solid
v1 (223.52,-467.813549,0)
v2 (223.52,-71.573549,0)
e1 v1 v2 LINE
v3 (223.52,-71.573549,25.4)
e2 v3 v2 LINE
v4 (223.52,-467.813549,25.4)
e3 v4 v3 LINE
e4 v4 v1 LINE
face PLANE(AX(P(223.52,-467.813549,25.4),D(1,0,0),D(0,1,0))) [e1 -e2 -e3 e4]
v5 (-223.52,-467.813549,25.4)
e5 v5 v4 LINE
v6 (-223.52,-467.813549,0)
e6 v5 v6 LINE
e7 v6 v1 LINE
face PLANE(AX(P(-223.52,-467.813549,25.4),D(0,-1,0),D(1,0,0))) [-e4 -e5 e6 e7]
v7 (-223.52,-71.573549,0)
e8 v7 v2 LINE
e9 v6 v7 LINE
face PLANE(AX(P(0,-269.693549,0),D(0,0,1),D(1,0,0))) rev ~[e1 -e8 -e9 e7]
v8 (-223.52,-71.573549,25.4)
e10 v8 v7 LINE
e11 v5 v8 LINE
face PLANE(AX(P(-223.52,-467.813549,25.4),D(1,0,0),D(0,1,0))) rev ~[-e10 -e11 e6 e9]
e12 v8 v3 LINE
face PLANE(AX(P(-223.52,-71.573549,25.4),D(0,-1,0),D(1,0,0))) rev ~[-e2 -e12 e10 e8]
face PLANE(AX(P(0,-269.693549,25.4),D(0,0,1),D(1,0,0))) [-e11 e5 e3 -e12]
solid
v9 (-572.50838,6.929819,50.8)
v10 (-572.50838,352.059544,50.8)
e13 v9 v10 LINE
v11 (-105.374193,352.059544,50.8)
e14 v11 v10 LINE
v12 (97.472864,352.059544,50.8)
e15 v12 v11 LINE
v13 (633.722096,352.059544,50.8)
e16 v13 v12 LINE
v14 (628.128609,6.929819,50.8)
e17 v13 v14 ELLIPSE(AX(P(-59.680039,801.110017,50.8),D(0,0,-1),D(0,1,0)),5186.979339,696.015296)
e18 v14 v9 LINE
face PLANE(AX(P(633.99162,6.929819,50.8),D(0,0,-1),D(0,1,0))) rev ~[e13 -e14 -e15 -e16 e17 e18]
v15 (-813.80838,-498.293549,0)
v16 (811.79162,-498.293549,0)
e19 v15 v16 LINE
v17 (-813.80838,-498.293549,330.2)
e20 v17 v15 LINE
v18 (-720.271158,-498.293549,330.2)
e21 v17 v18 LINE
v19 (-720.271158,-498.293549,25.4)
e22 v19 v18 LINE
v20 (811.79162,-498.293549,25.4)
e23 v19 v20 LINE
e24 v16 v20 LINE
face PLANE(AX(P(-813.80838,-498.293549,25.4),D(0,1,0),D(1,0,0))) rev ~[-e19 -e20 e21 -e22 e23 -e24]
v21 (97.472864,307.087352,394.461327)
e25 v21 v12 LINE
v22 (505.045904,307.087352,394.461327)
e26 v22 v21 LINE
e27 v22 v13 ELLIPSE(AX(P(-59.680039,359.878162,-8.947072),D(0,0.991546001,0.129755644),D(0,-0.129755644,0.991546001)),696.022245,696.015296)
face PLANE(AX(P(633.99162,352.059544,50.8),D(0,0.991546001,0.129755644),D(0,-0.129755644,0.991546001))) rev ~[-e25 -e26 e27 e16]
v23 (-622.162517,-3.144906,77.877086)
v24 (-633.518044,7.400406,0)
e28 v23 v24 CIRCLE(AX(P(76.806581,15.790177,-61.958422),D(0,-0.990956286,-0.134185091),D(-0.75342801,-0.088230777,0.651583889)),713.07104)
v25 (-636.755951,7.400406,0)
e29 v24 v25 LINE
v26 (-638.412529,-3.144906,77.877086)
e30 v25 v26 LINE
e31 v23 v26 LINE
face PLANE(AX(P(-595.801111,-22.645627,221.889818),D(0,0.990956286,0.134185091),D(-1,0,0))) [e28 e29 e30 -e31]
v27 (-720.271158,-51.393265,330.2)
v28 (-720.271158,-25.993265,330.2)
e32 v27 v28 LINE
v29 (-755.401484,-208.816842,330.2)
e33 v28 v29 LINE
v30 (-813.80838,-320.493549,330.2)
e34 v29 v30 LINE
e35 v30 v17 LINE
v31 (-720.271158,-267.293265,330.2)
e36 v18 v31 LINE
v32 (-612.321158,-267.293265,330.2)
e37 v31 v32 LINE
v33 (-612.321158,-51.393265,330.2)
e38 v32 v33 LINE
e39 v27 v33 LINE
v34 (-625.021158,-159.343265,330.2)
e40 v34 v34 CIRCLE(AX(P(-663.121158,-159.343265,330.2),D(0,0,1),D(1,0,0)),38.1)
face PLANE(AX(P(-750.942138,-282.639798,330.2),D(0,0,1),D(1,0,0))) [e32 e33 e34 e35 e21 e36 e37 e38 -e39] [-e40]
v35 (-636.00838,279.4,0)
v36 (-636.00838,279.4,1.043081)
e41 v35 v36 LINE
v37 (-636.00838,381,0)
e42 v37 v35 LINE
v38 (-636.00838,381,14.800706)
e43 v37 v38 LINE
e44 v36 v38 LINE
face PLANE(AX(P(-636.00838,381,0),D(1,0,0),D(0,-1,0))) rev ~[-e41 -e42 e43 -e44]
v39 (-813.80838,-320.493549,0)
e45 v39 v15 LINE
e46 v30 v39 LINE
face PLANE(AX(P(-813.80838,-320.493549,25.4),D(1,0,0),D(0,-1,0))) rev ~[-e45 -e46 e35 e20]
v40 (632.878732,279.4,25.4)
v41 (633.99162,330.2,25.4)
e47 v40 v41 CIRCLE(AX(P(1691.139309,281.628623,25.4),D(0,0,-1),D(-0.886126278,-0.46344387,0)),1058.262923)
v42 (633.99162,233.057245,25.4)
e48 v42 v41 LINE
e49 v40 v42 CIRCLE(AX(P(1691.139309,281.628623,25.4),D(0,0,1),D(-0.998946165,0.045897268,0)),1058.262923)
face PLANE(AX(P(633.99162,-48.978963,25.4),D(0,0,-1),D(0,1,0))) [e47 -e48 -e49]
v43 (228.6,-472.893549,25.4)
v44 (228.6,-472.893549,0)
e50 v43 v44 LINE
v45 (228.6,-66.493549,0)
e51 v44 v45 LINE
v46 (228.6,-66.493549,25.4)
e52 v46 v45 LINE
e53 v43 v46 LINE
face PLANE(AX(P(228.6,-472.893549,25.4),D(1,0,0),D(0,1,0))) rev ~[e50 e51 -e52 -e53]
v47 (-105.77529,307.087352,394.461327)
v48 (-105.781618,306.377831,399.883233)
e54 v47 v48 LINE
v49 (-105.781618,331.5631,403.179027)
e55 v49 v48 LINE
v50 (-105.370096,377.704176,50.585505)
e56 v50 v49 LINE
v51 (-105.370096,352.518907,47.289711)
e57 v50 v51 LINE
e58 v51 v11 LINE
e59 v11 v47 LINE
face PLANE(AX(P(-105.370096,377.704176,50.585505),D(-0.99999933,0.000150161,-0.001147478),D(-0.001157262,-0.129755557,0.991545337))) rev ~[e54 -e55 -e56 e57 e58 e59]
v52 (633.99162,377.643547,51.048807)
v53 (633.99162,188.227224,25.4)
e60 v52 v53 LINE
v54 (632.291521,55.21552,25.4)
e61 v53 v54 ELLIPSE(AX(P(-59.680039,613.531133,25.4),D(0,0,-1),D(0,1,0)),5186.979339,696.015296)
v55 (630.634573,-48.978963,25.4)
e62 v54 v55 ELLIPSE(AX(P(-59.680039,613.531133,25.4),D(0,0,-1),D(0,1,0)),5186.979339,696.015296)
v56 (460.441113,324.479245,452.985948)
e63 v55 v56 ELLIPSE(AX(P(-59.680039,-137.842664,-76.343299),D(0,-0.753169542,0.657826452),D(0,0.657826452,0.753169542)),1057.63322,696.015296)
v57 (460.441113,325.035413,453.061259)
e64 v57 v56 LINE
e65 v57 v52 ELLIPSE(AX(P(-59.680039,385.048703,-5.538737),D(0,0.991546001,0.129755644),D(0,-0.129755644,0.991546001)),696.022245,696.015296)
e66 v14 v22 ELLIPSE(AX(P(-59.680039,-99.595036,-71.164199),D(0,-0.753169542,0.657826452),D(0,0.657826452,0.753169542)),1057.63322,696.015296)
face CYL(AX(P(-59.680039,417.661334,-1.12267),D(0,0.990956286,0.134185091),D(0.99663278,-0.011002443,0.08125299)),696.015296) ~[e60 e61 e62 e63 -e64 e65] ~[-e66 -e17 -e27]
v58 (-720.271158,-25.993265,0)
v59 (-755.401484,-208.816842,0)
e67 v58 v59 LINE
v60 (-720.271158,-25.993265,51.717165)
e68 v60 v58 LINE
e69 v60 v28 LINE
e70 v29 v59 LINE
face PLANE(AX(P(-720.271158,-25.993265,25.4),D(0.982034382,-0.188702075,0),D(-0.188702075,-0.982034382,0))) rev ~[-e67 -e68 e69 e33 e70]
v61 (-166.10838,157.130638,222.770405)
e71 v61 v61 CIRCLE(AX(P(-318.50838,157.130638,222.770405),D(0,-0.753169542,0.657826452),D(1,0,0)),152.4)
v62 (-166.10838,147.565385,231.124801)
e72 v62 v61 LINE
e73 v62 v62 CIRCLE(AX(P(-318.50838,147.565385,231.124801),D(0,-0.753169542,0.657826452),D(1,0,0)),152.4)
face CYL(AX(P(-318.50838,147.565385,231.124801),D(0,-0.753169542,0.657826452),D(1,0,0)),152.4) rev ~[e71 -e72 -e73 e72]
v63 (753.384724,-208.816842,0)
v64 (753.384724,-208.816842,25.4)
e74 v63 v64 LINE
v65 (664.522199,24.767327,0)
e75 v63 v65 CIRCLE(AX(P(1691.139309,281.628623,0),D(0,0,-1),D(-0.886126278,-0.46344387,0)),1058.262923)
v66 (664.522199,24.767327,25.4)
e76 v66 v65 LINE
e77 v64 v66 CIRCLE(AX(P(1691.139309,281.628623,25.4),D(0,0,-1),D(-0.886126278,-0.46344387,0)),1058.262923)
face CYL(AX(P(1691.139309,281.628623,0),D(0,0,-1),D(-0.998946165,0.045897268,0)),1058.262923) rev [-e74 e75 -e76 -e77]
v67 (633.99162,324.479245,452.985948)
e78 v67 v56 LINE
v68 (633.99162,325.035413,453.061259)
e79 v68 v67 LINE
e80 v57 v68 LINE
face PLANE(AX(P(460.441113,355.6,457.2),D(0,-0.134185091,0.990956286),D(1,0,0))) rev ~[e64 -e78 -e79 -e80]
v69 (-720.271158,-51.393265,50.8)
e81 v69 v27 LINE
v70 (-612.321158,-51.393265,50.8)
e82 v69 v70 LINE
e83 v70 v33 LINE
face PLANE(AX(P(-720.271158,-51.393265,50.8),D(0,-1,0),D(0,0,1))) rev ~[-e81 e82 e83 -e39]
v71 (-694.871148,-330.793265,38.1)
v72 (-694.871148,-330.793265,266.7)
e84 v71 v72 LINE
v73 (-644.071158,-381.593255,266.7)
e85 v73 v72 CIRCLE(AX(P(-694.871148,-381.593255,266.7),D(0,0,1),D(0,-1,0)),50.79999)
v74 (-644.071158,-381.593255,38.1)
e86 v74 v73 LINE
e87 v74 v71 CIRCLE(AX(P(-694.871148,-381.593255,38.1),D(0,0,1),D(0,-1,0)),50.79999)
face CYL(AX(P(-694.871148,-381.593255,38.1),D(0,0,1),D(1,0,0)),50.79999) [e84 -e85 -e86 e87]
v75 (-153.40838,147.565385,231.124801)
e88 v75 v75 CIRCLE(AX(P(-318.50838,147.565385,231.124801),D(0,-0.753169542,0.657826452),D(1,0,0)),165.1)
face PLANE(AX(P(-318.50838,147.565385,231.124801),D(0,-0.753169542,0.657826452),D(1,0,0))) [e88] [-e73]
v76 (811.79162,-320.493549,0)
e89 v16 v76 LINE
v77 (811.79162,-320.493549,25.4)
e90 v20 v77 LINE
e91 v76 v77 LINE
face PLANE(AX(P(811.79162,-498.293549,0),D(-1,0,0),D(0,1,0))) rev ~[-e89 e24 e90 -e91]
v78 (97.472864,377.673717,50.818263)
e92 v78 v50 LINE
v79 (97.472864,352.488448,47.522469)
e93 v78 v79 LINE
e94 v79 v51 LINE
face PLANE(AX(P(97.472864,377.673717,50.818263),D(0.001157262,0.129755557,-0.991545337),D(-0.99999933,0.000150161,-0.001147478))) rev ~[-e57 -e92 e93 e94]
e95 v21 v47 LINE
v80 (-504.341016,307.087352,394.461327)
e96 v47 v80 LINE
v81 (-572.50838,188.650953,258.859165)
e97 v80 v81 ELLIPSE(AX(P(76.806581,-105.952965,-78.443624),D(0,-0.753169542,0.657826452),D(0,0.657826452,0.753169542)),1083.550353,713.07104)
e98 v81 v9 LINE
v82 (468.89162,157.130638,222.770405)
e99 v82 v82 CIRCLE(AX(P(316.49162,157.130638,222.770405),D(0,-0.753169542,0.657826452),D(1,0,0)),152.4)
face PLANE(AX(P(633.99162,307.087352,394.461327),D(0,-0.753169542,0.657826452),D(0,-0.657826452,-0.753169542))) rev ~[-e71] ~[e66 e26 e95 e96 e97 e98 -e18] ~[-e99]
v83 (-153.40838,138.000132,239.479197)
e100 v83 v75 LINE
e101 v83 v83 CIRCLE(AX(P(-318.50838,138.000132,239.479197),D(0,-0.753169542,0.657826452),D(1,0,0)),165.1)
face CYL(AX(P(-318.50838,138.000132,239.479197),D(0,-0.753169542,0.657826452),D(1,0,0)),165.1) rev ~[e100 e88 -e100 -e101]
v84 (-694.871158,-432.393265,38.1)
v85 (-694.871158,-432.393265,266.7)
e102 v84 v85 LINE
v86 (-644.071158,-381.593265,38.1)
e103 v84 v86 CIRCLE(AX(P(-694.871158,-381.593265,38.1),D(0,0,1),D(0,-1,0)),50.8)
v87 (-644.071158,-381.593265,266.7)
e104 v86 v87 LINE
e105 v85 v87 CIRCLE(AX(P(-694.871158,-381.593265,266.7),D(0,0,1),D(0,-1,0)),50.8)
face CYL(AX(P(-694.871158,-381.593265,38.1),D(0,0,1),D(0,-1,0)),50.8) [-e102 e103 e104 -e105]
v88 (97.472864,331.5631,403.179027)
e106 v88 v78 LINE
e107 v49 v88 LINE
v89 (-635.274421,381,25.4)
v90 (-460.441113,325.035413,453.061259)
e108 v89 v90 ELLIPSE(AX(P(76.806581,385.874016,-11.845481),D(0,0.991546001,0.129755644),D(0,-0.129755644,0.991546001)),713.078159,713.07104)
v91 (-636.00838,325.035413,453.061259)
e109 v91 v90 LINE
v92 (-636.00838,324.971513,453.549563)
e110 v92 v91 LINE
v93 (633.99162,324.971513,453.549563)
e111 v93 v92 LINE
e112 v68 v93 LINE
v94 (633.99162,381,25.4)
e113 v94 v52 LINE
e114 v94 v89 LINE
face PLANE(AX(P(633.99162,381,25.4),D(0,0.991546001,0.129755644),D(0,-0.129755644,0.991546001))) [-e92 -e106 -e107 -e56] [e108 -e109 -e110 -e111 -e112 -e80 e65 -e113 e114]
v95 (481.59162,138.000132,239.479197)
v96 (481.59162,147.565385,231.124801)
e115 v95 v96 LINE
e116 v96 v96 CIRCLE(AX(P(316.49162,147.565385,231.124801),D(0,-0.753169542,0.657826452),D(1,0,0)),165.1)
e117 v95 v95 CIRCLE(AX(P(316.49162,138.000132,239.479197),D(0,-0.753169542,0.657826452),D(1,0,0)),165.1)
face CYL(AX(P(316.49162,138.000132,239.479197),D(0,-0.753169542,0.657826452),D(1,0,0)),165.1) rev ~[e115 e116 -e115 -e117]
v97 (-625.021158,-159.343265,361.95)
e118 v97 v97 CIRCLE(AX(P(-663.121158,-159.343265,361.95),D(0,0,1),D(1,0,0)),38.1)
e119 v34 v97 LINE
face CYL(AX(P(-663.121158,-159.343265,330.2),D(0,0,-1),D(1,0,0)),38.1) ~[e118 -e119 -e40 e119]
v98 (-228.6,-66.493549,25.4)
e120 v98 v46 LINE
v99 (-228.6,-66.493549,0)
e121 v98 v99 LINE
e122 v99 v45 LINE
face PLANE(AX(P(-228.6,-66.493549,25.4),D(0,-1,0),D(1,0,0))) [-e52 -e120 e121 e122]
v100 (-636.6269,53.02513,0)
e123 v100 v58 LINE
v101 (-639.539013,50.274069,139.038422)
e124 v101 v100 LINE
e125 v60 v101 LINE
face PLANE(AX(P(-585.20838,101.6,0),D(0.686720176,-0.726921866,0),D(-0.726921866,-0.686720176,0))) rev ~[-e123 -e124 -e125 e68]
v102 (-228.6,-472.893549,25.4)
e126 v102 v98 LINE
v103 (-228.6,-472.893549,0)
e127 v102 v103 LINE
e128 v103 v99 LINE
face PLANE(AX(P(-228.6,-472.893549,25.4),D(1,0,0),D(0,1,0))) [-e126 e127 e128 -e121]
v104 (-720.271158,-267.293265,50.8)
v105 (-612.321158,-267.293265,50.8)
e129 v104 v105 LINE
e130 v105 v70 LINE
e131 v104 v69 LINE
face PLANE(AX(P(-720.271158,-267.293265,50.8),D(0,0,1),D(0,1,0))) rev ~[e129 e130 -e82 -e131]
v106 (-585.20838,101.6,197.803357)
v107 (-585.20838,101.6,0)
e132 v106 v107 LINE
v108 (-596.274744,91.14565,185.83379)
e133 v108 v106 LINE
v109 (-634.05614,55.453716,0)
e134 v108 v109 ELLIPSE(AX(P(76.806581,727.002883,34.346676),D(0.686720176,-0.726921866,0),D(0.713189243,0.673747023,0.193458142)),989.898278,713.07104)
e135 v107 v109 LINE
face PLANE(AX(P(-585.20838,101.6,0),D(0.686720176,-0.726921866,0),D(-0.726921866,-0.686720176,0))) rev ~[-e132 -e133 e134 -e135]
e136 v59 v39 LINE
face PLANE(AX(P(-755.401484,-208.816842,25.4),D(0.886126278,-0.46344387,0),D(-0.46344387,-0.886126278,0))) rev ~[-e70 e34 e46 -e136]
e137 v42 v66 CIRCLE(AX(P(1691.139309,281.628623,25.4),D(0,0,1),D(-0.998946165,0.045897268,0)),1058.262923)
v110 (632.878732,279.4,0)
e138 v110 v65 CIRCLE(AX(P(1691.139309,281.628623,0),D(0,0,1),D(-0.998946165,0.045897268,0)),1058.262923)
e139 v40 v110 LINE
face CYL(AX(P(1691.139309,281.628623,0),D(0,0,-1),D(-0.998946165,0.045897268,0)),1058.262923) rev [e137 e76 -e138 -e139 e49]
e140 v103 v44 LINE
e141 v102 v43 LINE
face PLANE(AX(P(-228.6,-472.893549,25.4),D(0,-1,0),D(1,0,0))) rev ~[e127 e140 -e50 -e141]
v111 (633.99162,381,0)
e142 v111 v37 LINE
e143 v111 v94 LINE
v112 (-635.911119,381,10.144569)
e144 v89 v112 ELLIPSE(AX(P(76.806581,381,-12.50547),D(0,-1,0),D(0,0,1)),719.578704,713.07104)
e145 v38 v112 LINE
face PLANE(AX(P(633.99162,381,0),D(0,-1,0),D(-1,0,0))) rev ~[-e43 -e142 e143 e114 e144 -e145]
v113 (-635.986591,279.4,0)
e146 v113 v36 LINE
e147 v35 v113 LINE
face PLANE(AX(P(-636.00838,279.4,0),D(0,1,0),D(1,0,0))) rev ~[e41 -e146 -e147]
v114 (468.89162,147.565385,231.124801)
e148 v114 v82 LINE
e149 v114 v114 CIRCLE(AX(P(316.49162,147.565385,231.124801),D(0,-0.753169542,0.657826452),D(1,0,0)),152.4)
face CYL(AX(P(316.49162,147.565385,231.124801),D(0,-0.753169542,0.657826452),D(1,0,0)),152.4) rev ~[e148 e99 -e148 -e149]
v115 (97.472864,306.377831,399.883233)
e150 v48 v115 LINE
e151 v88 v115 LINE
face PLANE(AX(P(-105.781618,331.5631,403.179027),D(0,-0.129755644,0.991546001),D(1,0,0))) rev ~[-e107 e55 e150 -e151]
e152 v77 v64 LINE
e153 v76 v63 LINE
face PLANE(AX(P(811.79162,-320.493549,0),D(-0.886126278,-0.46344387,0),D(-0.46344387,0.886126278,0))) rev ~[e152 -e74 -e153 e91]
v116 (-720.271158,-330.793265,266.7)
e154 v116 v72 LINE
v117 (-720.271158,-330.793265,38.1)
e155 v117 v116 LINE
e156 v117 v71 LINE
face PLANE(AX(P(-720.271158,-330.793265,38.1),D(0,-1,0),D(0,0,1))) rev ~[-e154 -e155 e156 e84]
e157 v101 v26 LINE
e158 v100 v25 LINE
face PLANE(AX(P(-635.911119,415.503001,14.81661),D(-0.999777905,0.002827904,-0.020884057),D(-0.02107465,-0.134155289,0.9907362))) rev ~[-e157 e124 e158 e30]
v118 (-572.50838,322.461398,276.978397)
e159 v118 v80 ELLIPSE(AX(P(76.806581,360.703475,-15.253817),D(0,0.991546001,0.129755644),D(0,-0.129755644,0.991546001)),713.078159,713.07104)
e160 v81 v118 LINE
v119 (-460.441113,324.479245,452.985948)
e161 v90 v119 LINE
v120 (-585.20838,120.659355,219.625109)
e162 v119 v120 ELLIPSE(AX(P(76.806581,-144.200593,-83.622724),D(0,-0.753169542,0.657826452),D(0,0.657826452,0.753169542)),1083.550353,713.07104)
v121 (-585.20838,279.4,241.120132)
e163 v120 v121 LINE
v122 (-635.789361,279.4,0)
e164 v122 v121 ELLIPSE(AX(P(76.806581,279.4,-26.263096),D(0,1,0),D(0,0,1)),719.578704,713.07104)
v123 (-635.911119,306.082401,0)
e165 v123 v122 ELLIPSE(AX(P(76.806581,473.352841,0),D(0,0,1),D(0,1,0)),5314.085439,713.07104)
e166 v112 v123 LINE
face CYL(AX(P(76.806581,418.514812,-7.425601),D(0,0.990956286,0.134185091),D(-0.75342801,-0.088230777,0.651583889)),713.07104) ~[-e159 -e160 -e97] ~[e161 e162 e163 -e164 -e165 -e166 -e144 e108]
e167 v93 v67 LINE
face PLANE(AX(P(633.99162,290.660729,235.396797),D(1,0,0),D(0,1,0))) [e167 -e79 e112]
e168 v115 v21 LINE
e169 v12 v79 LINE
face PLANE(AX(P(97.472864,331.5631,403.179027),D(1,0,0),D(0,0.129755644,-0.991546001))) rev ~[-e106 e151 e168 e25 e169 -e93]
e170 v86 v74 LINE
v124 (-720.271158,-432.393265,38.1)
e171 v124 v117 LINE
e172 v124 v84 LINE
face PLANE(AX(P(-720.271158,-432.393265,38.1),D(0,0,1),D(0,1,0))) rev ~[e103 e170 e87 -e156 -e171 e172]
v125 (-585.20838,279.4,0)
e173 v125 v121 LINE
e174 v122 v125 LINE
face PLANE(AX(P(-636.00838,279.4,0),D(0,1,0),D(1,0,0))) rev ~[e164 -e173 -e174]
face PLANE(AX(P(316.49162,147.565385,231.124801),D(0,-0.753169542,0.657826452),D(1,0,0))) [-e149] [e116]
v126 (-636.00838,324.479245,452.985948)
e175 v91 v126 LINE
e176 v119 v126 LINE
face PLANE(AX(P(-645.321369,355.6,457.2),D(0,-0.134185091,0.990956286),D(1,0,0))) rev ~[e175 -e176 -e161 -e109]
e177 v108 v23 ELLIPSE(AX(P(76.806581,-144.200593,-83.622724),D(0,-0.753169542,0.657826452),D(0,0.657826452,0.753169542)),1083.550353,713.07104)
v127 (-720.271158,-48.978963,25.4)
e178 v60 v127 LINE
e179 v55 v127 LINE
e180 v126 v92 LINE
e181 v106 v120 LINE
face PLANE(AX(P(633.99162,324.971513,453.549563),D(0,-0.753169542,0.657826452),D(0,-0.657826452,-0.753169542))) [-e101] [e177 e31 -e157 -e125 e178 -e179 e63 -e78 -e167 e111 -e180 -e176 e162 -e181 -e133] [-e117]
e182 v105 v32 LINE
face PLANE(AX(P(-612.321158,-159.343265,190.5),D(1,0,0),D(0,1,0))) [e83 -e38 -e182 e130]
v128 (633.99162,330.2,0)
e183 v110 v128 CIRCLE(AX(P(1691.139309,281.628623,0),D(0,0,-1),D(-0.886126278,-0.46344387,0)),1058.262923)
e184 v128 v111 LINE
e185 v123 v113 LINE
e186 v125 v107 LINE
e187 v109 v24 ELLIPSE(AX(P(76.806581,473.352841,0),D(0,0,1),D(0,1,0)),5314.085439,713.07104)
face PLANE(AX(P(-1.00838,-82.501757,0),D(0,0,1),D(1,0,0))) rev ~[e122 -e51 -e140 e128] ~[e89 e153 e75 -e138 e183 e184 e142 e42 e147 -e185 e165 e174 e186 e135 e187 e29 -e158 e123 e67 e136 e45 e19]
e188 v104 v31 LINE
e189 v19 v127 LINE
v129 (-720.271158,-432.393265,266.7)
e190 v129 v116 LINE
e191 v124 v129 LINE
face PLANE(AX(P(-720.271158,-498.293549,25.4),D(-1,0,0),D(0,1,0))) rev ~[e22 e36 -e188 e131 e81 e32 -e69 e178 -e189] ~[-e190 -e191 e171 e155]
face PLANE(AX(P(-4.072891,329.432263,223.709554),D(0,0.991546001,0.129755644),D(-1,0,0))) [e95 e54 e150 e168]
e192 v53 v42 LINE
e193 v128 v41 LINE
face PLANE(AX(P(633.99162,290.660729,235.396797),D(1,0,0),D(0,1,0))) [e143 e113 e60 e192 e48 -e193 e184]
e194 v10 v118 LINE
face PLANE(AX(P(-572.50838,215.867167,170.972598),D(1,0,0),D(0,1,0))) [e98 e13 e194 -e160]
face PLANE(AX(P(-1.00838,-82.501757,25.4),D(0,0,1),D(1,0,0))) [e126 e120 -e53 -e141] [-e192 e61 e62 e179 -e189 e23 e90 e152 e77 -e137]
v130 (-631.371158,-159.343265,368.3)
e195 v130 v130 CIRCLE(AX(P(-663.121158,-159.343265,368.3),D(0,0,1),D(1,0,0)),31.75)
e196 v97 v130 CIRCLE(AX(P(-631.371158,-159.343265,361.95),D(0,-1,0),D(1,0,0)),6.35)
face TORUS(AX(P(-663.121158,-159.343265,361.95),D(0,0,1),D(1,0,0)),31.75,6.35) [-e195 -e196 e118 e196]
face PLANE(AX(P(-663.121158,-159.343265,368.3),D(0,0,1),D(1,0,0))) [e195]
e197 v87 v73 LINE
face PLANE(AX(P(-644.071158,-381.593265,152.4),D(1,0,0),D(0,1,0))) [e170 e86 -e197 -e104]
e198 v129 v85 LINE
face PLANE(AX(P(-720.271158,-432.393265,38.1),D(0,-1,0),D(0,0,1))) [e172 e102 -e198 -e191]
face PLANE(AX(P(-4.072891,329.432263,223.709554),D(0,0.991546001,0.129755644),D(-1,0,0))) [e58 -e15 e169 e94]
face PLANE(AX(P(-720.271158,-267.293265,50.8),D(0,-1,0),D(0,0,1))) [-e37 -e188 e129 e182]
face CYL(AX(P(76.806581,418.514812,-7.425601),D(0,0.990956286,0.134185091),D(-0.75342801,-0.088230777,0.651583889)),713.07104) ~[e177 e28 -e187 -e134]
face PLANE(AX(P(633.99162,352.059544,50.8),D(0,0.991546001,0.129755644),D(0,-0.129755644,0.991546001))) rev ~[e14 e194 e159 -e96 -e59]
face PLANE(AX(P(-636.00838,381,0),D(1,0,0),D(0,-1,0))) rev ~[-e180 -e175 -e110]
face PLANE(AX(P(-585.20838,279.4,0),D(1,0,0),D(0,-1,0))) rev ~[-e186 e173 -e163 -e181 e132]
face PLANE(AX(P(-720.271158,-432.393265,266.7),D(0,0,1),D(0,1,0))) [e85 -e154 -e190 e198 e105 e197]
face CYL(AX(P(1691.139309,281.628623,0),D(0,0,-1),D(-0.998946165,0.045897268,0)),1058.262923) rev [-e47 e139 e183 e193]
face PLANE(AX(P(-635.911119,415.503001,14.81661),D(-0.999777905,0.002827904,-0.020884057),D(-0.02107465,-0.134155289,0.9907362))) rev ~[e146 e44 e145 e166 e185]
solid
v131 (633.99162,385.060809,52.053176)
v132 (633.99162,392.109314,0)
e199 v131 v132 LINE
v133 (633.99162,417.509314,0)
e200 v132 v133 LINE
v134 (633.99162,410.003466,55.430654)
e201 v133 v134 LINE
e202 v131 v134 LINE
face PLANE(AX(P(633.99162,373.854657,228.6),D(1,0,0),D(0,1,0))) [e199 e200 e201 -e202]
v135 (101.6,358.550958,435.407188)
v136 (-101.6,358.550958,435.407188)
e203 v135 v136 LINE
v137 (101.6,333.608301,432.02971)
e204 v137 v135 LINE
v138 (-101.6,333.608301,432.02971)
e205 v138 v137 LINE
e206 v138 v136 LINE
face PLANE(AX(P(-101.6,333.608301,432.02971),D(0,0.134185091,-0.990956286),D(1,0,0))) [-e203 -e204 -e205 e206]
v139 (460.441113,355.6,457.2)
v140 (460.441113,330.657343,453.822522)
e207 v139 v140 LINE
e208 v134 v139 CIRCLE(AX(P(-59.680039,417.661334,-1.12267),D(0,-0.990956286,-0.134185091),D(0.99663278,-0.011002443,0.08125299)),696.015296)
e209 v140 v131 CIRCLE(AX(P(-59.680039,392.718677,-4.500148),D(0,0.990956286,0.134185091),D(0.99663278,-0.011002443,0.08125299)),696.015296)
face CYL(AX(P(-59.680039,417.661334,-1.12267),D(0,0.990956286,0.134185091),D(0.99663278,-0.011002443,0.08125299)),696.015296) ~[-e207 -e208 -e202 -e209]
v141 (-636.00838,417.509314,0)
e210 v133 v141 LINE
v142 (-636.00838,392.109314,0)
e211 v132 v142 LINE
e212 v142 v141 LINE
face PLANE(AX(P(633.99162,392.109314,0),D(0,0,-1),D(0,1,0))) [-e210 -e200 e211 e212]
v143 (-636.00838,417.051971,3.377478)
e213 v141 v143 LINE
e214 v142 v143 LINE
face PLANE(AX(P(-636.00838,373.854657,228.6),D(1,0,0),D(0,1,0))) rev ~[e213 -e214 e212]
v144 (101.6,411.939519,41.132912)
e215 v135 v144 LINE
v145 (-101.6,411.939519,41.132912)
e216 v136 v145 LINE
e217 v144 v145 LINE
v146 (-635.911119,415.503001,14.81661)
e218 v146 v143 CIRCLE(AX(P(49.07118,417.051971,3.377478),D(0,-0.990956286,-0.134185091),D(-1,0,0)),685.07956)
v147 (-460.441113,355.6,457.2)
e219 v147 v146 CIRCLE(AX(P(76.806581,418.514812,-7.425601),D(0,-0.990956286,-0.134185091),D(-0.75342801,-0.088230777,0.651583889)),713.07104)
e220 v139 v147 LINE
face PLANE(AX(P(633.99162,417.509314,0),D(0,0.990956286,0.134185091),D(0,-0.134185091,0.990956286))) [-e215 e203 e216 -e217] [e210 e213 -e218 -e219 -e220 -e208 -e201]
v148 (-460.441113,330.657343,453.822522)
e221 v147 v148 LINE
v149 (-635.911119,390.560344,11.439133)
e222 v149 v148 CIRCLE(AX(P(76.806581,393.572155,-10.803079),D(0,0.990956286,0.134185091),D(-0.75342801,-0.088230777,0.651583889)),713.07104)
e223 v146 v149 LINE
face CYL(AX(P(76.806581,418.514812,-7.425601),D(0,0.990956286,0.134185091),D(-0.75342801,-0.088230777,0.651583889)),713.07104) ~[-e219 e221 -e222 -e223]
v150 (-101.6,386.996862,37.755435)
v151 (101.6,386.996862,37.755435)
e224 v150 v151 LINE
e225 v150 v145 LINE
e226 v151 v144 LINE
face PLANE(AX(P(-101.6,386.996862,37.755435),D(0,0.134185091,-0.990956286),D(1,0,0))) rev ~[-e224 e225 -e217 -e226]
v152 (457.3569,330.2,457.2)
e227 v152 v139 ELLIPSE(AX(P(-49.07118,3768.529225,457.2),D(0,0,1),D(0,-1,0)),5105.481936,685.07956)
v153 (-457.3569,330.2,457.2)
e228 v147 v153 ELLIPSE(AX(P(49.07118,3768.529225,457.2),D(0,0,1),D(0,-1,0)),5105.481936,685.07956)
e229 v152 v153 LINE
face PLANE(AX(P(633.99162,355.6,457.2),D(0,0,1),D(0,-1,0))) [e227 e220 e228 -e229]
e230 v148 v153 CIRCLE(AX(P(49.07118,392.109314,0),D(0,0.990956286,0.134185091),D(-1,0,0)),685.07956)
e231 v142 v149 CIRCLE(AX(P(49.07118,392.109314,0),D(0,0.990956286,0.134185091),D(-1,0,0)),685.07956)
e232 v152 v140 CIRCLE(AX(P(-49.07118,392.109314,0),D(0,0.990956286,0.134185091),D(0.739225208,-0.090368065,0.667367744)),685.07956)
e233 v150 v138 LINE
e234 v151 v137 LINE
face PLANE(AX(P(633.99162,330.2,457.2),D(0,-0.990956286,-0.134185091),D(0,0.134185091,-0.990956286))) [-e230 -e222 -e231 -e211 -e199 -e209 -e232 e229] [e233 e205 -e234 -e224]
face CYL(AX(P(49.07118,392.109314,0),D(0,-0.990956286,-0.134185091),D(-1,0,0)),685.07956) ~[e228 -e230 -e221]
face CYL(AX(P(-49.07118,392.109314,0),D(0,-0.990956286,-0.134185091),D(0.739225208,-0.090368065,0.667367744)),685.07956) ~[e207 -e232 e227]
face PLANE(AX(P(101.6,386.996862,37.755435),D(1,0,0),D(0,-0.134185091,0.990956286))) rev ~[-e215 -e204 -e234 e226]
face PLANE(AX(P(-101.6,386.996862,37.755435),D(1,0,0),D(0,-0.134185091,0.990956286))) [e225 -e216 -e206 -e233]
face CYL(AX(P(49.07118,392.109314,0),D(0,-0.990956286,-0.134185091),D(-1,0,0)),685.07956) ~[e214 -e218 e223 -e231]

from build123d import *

# Parameters (mm, degrees)
F1_DEPTH  = 25.4
F3_DEPTH  = 1270
F5_W      = 457.2
F5_H      = 406.4
F6_DEPTH  = 25.4
F7_W      = 447.04
F7_H      = 396.24
F8_DEPTH  = 25.4
F10_DEPTH = 1358.9
F11_R     = 165.1
F12_DEPTH = 12.7
F14_DEPTH = 1206.5
F16_DEPTH = 25.4
F17_R     = 152.4
F18_DEPTH = 25.4
F4_W      = 203.2
F4_H      = 397.8725210062
F19_DEPTH = 25.4
F21_DEPTH = 25.4
F23_DEPTH = 459.74
F24_W     = 185.8009562355
F24_H     = 25.4
F25_DEPTH = 127
F27_DEPTH = 25.4
F29_DEPTH = 25.4
F31_DEPTH = 304.8
F32_W     = 215.9
F32_H     = 279.4
F33_DEPTH = 107.95
F34_W     = 101.6
F34_H     = 228.6
F35_DEPTH = 76.2
F36_R     = 50.8
F37_R     = 50.79999
F38_R     = 38.1
F39_DEPTH = 38.1
F40_R     = 6.35
F42_DEPTH = 508
F44_DEPTH = 406.4


# Not quite as in the source:
# - a fillet or chamfer is up to 0.001 mm smaller than in the source, because OpenCascade refuses the exact size


with BuildPart() as f1:
    # F0 (on Top) → F1 (new body)
    with BuildSketch(Plane.XY):
        Polygon((633.9916200739, 381), (-636.0083799261, 381), (-636.0083799261, 279.4), (-585.2083799261, 279.4), (-585.2083799261, 101.6), (-720.2711577423, -25.9932654437), (-755.401483878, -208.8168415053), (-813.8083799261, -320.4935488224), (-813.8083799261, -498.2935488224), (-636.0083799261, -498.2935488224), (633.9916200739, -498.2935488224), (811.7916200739, -498.2935488224), (811.7916200739, -320.4935488224), (753.3847240259, -208.8168415053), (718.2543978901, -25.9932654437), (583.1916200739, 101.6), (583.1916200739, 279.4), (633.9916200739, 279.4), align=None)
    extrude(amount=F1_DEPTH)

    # F5 (on face) → F6 (cut)
    with BuildSketch(Plane.XY.offset(25.4)):
        with Locations((0, -269.6935488224)):
            Rectangle(F5_W, F5_H)
    extrude(amount=-F6_DEPTH, mode=Mode.SUBTRACT)


with BuildPart() as f3:
    # F2 (on face) → F3 (new body)
    with BuildSketch(Plane.YZ.offset(633.9916200739)):
        Polygon((355.6, 457.2), (330.2, 457.2), (392.1093138361, 0), (417.5093138361, 0), align=None)
    extrude(amount=-F3_DEPTH)

    # F4 (on face) → F19 (cut)
    with BuildSketch(Plane(origin=(0, 385.0491351938, 52.1393870364), x_dir=(1, 0, 0), z_dir=(0, -0.9909562863, -0.1341850913))):
        with Locations((0, 184.4210364421)):
            Rectangle(F4_W, F4_H)
    extrude(amount=-F19_DEPTH, mode=Mode.SUBTRACT)

    # F20 (on face) → F21 (cut)
    with BuildSketch(Plane(origin=(0, 385.0491351938, 52.1393870364), x_dir=(1, 0, 0), z_dir=(0, -0.9909562863, -0.1341850913))):
        with BuildLine():
            ThreePointArc((-636.0083799261, -52.615224061), (-589.7862100298, 194.7614898935), (-457.3568999767, 408.7572969452))
            Line((-457.3568999767, 408.7572969452), (-636.0083799261, 408.7572969452))
            Line((-636.0083799261, 408.7572969452), (-636.0083799261, -52.615224061))
        make_face()
        with BuildLine():
            Line((633.9916200739, 408.7572969452), (457.3568999767, 408.7572969452))
            ThreePointArc((457.3568999767, 408.7572969452), (579.8251172789, 219.089488202), (633.9916200739, -0.0869975296))
            Line((633.9916200739, -0.0869975296), (633.9916200739, 408.7572969452))
        make_face()
    extrude(amount=-F21_DEPTH, mode=Mode.SUBTRACT)


with BuildPart() as f8:
    # F7 (on face) → F8 (new body)
    with BuildSketch(Plane.XY.offset(25.4)):
        with Locations((0, -269.6935488224)):
            Rectangle(F7_W, F7_H)
    extrude(amount=-F8_DEPTH)


with BuildPart() as f10:
    # F9 (on face) → F10 (new body)
    with BuildSketch(Plane.YZ.offset(633.9916200739)):
        Polygon((137.9962750452, 239.4747816958), (381, 25.4), (324.9715128924, 453.5495633916), align=None)
        Polygon((-48.9789628019, 25.4), (381, 25.4), (137.9962750452, 239.4747816958), align=None)
    extrude(amount=-F10_DEPTH)

    # F11 (on face) → F12 (cut)
    with BuildSketch(Plane(origin=(0, -40.3685730448, 35.2583498477), x_dir=(1, 0, 0), z_dir=(0, -0.7531695417, 0.6578264524))):
        with Locations((-318.5083799261, 271.1485742475)):
            Circle(F11_R)
        with Locations((316.4916200739, 271.1485742475)):
            Circle(F11_R)
    extrude(amount=-F12_DEPTH, mode=Mode.SUBTRACT)

    # F13 (on face) → F14 (cut)
    with BuildSketch(Plane.YZ.offset(633.9916200739)):
        Polygon((352.0595440659, 50.8), (307.0873524009, 394.4613269455), (6.9298194327, 50.8), align=None)
    extrude(amount=-F14_DEPTH, mode=Mode.SUBTRACT)

    # F15 (on face) → F16 (cut)
    with BuildSketch(Plane(origin=(0, 377.8532138761, 49.446608691), x_dir=(-1, 0, 0), z_dir=(0, 0.9915460014, 0.1297556441))):
        Polygon((105.7816183023, 356.7483680457), (-97.4728635717, 356.7483680457), (-97.4728635717, 1.383348692), (105.3700960746, 1.1486061652), align=None)
    extrude(amount=-F16_DEPTH, mode=Mode.SUBTRACT)

    # F17 (on face) → F18 (cut)
    with BuildSketch(Plane(origin=(0, -30.8033198656, 26.9039539021), x_dir=(1, 0, 0), z_dir=(0, -0.7531695417, 0.6578264524))):
        with Locations((-318.5083799261, 271.1485742475)):
            Circle(F17_R)
        with Locations((316.4916200739, 271.1485742475)):
            Circle(F17_R)
    extrude(amount=-F18_DEPTH, mode=Mode.SUBTRACT)


with BuildPart() as f23_tool:
    # F22 (on face) → F23 (new body)
    with BuildSketch(Plane(origin=(0, 409.9917919704, 55.5168646529), x_dir=(-1, 0, 0), z_dir=(0, 0.9909562863, 0.1341850913))):
        with BuildLine():
            ThreePointArc((-633.9916200739, -0.0869975295), (-580.1776273816, 216.7403618545), (-460.4411130957, 405.3489956272))
            Line((-460.4411130957, 405.3489956272), (-652.6208519936, 405.3489956272))
            Line((-652.6208519936, 405.3489956272), (-633.9916200739, -0.0869975295))
        make_face()
    extrude(amount=-F23_DEPTH)


with BuildPart() as f1_1:
    add(f1.part)

    # F23: cut by f23_tool
    add(f23_tool.part, mode=Mode.SUBTRACT)



with BuildPart() as f3_1:
    add(f3.part)

    # F23: cut by f23_tool
    add(f23_tool.part, mode=Mode.SUBTRACT)


with BuildPart() as f10_1:
    add(f10.part)

    # F23: cut by f23_tool
    add(f23_tool.part, mode=Mode.SUBTRACT)


with BuildPart() as f1_2:
    add(f1_1.part)

    add(f10_1.part)  # F25 merges F10
    # F24 (on face) → F25 (join)
    with BuildSketch(Plane(origin=(325.7420855468, 344.8115445011, 0), x_dir=(-0.726921866, 0.6867201764, 0), z_dir=(0.6867201764, 0.726921866, 0))):
        with Locations((-447.0644489093, 12.7)):
            Rectangle(F24_W, F24_H)
    extrude(amount=-F25_DEPTH)

    # F26 (on face) → F27 (join)
    with BuildSketch(Plane(origin=(0, 0, 0), x_dir=(1, 0, 0), z_dir=(0, 0, -1))):
        with BuildLine():
            ThreePointArc((633.9916200739, -330.2), (657.9193133131, -52.7687190683), (753.3847240259, 208.8168415053))
            Line((753.3847240259, 208.8168415053), (533.1680178642, 208.8168415053))
            Line((533.1680178642, 208.8168415053), (533.1680178642, -330.2))
            Line((533.1680178642, -330.2), (633.9916200739, -330.2))
        make_face()
    extrude(amount=-F27_DEPTH)

    # F28 (on face) → F29 (cut)
    with BuildSketch(Plane(origin=(0, 0, 0), x_dir=(1, 0, 0), z_dir=(0, 0, -1))):
        with BuildLine():
            Line((763.2642388344, -52.6611953974), (753.3847240259, 208.8168415053))
            ThreePointArc((753.3847240259, 208.8168415053), (657.9193133131, -52.7687190683), (633.9916200739, -330.2))
            Line((633.9916200739, -330.2), (763.2642388344, -52.6611953974))
        make_face()
    extrude(amount=-F29_DEPTH, mode=Mode.SUBTRACT)

    # F30 (on face) → F31 (join)
    with BuildSketch(Plane.XY.offset(25.4)):
        Polygon((-720.2711577423, -498.2935488224), (-720.2711577423, -25.9932654437), (-745.6711577423, -158.1787400112), (-755.401483878, -208.8168415053), (-813.8083799261, -320.4935488224), (-813.8083799261, -498.2935488224), (-745.6711577423, -498.2935488224), align=None)
    extrude(amount=F31_DEPTH)

    # F32 (on face) → F33 (join)
    with BuildSketch(Plane.YZ.offset(-720.2711577423)):
        with Locations((-159.3432654437, 190.5)):
            Rectangle(F32_W, F32_H)
    extrude(amount=F33_DEPTH)

    # F34 (on face) → F35 (join)
    with BuildSketch(Plane.YZ.offset(-720.2711577423)):
        with Locations((-381.5932654437, 152.4)):
            Rectangle(F34_W, F34_H)
    extrude(amount=F35_DEPTH)

    # F36
    f36_edges = [f1_2.edges().sort_by_distance(p)[0] for p in [
        (-644.071158, -432.393265, 152.4),
    ]]
    fillet(f36_edges, radius=F36_R)

    # F37 (radius 50.8 in the source; OpenCascade refuses exactly that, so slightly less here)
    f37_edges = [f1_2.edges().sort_by_distance(p)[0] for p in [
        (-644.071158, -330.793265, 152.4),
    ]]
    fillet(f37_edges, radius=F37_R)

    # F38 (on face) → F39 (join)
    with BuildSketch(Plane.XY.offset(330.2)):
        with Locations((-663.1211577423, -159.3432654437)):
            Circle(F38_R)
    extrude(amount=F39_DEPTH)

    # F40
    f40_edges = [f1_2.edges().sort_by_distance(p)[0] for p in [
        (-701.221158, -159.343265, 368.3),
    ]]
    fillet(f40_edges, radius=F40_R)

    # F41 (on face) → F42 (cut)
    with BuildSketch(Plane(origin=(0, 0, 0), x_dir=(1, 0, 0), z_dir=(0, 0, -1))):
        Polygon((-751.9905567169, -381), (-636.0083799261, -381), (-636.0083799261, -279.4), (-585.2083799261, -279.4), (-585.2083799261, -101.6), (-720.2711577423, 25.9932654437), (-724.7296735254, 49.1960616901), (-755.401483878, 78.8422897458), align=None)
    extrude(amount=-F42_DEPTH, mode=Mode.SUBTRACT)


with BuildPart() as f44_tool:
    # F43 (on face) → F44 (new body)
    with BuildSketch(Plane(origin=(0, 409.9917919704, 55.5168646529), x_dir=(-1, 0, 0), z_dir=(0, 0.9909562863, 0.1341850913))):
        with BuildLine():
            ThreePointArc((460.4411130957, 405.3489956272), (586.8395822523, 197.335702788), (635.9111193057, -41.0716948618))
            Line((635.9111193057, -41.0716948618), (645.3213691711, 405.3489956272))
            Line((645.3213691711, 405.3489956272), (460.4411130957, 405.3489956272))
        make_face()
    extrude(amount=-F44_DEPTH)


with BuildPart() as f1_3:
    add(f1_2.part)

    # F44: cut by f44_tool
    add(f44_tool.part, mode=Mode.SUBTRACT)


with BuildPart() as f3_2:
    add(f3_1.part)

    # F44: cut by f44_tool
    add(f44_tool.part, mode=Mode.SUBTRACT)


solid = Compound([f8.part, f1_3.part, f3_2.part])
